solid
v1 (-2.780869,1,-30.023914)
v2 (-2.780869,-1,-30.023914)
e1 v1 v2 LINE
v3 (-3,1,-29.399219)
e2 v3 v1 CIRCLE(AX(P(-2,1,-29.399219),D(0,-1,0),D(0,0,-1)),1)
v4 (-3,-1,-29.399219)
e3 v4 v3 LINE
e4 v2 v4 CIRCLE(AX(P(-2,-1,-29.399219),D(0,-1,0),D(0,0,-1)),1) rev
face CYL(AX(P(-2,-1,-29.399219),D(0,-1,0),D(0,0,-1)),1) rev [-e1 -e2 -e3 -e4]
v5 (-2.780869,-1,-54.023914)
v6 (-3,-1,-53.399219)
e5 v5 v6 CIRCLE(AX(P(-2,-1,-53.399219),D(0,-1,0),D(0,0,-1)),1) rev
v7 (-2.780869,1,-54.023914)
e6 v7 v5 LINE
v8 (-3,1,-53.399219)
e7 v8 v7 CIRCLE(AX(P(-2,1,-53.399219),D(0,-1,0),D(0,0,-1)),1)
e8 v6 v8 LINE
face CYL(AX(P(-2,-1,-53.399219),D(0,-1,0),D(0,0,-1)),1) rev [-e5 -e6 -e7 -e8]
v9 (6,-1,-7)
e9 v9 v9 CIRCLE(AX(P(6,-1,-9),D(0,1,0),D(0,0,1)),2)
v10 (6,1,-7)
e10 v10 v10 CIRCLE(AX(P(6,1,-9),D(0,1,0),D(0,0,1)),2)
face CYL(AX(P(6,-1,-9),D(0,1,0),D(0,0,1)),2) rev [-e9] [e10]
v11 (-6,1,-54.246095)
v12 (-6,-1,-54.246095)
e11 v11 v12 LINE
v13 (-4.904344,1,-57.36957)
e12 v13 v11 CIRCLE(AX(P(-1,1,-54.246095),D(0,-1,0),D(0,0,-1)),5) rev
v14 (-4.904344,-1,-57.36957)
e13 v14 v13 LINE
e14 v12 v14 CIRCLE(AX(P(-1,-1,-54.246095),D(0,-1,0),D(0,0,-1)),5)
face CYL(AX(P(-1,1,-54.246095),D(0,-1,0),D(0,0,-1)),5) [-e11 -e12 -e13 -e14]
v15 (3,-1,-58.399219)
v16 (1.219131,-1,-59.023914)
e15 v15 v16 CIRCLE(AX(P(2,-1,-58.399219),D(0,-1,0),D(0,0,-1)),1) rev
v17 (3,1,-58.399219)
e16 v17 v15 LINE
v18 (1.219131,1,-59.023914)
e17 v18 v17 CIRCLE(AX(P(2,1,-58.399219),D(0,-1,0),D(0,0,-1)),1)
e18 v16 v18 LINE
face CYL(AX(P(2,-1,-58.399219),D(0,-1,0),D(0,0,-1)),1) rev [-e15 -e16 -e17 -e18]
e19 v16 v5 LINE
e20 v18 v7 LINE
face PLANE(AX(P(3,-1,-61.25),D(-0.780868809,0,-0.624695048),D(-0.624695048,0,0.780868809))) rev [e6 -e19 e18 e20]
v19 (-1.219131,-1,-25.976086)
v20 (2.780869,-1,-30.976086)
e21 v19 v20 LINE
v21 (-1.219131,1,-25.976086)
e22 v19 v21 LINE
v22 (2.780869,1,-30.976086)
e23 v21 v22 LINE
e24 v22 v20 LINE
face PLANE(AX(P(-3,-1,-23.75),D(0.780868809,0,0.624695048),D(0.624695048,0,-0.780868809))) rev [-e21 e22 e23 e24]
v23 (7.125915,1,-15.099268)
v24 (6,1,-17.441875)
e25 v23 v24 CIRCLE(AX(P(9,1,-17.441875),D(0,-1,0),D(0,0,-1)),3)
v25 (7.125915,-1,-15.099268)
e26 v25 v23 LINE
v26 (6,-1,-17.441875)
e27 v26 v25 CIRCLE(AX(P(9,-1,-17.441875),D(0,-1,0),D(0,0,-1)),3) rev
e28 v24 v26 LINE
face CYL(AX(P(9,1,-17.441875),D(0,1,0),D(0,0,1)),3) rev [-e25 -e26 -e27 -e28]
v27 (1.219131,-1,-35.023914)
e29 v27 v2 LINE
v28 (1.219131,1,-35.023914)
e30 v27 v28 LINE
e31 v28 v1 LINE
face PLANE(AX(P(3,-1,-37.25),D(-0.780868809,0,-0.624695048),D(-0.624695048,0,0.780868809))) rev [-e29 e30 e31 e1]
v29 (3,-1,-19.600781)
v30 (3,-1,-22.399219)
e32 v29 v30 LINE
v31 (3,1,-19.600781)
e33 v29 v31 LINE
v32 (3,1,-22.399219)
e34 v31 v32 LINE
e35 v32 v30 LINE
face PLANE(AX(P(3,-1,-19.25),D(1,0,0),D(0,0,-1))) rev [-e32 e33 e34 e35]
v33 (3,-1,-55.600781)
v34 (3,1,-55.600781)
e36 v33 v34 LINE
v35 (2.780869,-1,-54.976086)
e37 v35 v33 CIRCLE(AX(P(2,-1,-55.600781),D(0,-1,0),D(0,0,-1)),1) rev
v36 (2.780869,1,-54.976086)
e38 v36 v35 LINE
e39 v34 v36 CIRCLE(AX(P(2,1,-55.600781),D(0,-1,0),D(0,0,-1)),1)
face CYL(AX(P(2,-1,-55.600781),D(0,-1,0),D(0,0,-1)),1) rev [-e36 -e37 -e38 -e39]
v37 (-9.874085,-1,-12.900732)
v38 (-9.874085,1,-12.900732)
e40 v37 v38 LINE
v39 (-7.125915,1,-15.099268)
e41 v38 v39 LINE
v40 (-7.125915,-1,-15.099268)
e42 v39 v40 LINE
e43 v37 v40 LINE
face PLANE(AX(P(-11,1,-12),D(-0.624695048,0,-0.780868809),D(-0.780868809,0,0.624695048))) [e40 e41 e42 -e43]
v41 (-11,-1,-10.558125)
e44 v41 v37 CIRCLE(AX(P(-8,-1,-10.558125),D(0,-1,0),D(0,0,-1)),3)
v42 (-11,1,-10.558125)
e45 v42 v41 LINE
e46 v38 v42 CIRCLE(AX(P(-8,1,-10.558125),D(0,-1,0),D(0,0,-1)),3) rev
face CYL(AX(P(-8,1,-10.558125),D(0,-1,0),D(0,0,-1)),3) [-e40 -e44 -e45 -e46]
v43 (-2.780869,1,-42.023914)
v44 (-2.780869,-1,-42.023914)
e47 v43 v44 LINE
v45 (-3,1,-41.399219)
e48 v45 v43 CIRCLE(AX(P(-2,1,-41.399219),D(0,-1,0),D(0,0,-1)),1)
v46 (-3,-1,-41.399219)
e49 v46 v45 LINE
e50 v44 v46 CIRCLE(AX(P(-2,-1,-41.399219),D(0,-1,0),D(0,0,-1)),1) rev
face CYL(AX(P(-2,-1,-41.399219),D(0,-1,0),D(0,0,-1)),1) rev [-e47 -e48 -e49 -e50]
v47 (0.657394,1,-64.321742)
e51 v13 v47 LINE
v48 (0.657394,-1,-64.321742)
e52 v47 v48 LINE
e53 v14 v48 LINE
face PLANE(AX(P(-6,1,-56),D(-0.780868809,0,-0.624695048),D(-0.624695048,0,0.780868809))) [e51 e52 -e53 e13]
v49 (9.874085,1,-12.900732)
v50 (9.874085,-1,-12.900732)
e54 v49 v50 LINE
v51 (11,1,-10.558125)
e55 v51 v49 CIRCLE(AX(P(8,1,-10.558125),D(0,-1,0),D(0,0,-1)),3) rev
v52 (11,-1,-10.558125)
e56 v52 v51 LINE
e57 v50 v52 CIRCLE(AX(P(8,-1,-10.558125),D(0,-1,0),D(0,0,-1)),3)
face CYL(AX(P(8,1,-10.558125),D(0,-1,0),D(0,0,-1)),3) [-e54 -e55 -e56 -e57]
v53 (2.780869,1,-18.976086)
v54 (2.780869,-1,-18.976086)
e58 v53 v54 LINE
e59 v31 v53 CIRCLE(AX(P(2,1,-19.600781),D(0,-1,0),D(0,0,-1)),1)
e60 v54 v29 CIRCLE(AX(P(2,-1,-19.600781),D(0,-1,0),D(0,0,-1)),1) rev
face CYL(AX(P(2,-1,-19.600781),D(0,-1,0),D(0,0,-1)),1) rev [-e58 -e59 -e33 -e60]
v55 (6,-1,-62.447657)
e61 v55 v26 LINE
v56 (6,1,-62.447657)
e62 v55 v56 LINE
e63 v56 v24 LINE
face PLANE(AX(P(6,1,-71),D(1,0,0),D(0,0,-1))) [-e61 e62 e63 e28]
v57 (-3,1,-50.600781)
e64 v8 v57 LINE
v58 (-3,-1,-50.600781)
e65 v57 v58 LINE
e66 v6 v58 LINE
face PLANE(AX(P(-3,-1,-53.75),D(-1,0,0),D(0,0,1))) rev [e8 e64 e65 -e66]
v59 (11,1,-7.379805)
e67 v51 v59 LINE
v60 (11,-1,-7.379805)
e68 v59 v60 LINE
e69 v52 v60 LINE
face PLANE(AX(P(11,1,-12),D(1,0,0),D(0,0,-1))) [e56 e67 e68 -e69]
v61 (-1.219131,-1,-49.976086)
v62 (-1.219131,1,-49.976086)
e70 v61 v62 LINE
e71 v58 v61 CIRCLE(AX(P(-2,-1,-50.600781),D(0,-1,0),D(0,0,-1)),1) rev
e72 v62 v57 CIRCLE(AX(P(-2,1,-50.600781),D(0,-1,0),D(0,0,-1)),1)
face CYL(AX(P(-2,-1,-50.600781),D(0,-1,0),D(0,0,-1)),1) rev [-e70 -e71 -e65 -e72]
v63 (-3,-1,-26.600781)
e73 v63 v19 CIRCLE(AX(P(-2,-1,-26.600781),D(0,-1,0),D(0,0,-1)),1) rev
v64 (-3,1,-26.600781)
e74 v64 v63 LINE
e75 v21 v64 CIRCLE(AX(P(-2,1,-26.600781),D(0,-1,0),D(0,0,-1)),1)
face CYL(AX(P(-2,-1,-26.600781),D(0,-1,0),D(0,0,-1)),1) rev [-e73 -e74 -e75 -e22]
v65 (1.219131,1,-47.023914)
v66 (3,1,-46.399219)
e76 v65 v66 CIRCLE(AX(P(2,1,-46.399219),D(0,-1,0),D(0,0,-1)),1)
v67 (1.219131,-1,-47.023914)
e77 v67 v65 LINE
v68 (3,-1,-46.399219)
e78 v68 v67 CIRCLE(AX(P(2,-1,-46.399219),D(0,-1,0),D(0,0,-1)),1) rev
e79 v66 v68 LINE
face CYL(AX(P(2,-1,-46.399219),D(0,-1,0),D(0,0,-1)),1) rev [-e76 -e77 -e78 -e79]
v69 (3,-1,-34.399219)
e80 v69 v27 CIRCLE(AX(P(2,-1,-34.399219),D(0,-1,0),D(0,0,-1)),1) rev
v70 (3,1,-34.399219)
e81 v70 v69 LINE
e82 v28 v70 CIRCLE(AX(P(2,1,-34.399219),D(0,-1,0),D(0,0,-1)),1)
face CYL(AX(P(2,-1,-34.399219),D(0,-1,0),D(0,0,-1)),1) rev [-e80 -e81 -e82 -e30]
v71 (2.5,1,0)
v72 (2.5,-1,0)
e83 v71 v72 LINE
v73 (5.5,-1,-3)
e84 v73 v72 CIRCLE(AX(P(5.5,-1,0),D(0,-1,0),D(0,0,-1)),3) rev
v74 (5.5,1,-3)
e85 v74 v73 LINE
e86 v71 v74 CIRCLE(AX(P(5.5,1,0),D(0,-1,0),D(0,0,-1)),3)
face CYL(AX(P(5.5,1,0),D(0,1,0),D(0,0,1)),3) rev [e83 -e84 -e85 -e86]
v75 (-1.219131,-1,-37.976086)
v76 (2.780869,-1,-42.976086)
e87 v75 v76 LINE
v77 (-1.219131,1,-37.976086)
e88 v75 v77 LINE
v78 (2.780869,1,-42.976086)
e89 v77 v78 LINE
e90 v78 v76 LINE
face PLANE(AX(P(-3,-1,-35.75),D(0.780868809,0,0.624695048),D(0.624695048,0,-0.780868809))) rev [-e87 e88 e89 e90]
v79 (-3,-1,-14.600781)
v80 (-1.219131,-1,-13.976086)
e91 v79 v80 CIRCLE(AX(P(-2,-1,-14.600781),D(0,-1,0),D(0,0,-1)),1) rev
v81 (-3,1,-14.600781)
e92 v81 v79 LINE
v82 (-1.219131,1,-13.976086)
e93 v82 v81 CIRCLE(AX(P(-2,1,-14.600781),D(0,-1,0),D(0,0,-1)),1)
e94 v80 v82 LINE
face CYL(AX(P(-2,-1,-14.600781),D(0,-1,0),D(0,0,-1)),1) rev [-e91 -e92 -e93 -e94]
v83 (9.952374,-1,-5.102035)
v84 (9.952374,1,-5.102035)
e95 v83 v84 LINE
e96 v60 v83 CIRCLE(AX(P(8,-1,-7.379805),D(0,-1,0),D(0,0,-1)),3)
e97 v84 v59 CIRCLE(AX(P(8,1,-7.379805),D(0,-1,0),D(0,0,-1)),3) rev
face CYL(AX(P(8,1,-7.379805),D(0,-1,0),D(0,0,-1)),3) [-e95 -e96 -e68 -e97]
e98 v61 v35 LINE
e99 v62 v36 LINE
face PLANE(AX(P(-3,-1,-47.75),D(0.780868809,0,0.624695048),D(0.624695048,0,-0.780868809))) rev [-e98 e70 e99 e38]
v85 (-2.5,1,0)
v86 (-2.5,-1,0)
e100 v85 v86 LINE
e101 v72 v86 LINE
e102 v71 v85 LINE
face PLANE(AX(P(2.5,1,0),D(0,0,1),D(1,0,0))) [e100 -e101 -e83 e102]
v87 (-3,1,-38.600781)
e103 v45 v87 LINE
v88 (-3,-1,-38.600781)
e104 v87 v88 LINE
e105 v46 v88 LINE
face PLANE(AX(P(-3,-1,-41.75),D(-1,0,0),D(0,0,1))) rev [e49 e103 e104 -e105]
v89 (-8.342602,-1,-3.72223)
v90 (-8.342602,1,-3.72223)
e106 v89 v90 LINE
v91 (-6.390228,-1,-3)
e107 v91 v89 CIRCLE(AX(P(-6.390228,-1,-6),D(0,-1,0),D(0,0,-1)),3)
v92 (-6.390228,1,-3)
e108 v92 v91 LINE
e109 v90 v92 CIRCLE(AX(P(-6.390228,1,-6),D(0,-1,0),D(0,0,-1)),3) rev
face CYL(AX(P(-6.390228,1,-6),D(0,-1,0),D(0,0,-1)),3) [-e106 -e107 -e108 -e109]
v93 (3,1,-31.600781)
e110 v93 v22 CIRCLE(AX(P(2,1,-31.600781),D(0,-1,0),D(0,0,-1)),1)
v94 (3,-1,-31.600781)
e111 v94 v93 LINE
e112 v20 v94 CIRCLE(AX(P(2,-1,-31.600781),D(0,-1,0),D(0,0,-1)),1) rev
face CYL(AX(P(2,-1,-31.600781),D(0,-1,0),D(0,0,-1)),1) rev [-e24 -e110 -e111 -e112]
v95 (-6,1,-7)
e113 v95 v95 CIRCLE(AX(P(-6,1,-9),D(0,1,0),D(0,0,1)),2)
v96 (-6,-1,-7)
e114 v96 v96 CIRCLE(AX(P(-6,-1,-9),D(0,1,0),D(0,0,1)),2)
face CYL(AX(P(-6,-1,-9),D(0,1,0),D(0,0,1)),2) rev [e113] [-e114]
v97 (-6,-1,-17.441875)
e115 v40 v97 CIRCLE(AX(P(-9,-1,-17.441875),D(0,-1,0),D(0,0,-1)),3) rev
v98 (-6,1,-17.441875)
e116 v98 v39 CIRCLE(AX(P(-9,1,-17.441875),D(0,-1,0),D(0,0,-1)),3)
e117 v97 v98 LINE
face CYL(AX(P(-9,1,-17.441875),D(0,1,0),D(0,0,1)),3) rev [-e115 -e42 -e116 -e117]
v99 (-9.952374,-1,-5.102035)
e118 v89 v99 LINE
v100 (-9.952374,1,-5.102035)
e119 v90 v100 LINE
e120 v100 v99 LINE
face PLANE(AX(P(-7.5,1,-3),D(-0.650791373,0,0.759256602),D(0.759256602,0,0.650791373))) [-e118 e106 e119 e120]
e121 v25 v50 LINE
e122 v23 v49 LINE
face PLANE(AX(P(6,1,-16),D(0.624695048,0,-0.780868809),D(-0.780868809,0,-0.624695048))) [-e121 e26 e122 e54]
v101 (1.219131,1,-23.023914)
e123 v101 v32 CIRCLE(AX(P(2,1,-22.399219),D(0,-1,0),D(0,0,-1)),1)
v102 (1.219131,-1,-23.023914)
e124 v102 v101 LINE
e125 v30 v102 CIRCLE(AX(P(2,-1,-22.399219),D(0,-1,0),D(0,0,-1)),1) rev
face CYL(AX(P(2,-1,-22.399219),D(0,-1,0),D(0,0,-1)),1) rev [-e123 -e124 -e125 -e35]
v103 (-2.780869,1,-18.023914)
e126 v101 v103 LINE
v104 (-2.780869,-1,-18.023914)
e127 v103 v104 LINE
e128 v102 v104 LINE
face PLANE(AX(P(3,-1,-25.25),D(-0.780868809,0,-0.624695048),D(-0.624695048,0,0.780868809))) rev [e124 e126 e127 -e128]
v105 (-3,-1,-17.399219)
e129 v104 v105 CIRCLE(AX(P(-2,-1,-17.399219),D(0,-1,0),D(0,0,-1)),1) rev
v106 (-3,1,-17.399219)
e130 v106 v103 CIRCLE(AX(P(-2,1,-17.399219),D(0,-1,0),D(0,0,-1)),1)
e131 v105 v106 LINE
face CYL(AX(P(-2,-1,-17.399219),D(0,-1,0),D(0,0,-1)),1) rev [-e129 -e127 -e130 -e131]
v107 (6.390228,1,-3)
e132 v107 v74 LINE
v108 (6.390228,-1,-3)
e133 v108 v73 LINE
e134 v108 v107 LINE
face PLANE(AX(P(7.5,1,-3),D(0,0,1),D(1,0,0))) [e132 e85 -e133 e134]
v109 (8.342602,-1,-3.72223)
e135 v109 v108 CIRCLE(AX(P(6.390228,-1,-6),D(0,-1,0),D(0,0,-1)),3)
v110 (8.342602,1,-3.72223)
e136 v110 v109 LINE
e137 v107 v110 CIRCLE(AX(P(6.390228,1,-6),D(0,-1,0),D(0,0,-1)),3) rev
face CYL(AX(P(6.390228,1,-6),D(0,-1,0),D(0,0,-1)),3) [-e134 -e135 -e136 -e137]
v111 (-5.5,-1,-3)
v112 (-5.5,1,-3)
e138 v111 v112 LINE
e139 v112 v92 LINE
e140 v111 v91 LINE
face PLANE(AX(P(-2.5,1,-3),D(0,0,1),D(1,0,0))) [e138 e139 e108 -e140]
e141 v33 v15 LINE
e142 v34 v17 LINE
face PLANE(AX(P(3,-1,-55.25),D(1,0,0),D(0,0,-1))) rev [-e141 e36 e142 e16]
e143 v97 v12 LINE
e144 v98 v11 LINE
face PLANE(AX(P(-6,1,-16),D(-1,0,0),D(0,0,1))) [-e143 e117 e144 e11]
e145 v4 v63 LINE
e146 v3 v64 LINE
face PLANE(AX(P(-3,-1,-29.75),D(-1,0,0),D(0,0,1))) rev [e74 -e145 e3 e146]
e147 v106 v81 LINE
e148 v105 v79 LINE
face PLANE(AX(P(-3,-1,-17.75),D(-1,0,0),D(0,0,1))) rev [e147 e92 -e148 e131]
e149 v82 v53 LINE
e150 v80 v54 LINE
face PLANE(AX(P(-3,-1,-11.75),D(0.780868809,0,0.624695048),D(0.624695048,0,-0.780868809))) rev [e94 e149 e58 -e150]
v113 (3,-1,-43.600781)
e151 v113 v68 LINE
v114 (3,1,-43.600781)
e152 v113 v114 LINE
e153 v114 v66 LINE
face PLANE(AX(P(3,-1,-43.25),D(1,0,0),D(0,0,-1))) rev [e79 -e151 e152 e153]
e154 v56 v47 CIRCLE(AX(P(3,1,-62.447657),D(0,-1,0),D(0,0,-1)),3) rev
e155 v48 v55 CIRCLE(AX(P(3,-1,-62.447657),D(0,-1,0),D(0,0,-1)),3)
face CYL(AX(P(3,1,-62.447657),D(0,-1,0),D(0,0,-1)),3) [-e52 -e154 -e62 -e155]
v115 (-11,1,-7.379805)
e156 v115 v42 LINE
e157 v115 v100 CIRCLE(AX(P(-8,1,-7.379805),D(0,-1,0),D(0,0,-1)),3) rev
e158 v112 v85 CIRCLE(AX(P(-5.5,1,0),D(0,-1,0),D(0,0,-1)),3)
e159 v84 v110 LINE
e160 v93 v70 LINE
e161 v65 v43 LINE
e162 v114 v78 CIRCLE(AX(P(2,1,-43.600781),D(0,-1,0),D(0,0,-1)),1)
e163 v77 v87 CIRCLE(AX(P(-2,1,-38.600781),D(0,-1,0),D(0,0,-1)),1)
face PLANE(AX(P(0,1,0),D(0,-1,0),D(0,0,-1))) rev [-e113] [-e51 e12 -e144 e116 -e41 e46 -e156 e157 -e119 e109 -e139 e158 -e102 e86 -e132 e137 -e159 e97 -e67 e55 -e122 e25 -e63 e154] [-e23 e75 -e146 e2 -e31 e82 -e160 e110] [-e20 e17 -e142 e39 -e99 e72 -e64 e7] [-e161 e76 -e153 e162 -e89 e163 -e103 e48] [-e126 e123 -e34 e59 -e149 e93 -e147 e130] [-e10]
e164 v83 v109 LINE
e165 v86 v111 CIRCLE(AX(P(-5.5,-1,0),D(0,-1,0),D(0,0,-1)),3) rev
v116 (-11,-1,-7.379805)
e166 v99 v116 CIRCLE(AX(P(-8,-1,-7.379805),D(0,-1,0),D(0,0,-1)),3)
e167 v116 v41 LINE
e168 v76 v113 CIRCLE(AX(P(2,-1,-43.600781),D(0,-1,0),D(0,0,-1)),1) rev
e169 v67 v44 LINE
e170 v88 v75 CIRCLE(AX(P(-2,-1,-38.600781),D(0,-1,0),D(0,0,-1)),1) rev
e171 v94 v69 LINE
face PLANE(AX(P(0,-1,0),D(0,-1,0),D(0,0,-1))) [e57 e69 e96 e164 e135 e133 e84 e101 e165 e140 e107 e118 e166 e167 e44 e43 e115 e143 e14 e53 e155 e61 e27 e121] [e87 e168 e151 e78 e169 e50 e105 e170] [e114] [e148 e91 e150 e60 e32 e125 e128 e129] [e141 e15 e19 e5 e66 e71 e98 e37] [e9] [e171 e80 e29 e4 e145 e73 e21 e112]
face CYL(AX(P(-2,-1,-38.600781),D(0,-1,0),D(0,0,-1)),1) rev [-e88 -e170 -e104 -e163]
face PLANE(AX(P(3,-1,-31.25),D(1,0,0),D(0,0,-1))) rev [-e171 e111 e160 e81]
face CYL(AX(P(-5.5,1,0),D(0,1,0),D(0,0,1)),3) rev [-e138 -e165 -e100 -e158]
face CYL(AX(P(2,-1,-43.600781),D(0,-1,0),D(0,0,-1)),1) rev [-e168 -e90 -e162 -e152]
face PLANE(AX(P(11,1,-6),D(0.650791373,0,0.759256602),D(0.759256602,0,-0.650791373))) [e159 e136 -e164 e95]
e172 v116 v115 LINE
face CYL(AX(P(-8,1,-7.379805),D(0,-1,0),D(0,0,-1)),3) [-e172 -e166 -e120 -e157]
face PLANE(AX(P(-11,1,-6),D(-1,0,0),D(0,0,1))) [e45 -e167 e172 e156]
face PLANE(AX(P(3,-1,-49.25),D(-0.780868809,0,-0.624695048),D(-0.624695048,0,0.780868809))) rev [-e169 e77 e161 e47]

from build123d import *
from OCP.BRepFilletAPI import BRepFilletAPI_MakeFillet

# Parameters (mm, degrees)
BOSS_EXTRUDE1_DEPTH     = 1
CUT_EXTRUDE1_DEPTH      = 72.854018677
CUT_EXTRUDE2_DEPTH      = 72.854018677
CUT_EXTRUDE2_DEPTH_BACK = 72.854018677
SKETCH2_R               = 2
FILLET1_R               = 3
FILLET2_R               = 3
FILLET3_R1              = 5
FILLET3_R2              = 3
FILLET4_R               = 1
LPATTERN1_COUNT         = 4
LPATTERN1_PITCH         = 12
FILLET4_OF_LPATTERN1_R  = 1


with BuildPart() as part:
    # Sketch1 → Boss-Extrude1 (new, symmetric)
    with BuildSketch(Plane(origin=(0, 0, 0), x_dir=(1, 0, 0), z_dir=(0, 1, 0))):
        Polygon((-6, 56), (6, 71), (6, 16), (11, 12), (11, 6), (7.5, 3), (2.5, 3), (2.5, 0), (-2.5, 0), (-2.5, 3), (-7.5, 3), (-11, 6), (-11, 12), (-6, 16), align=None)
    extrude(amount=BOSS_EXTRUDE1_DEPTH, both=True)

    # Sketch1<3> → Cut-Extrude1 (cut, symmetric)
    with BuildSketch(Plane(origin=(0, 0, 0), x_dir=(1, 0, 0), z_dir=(0, 1, 0))):
        Polygon((3, 61.25), (-3, 53.75), (-3, 47.75), (3, 55.25), align=None)
    cut_extrude1 = extrude(amount=CUT_EXTRUDE1_DEPTH, both=True, mode=Mode.SUBTRACT)

    # Sketch2 → Cut-Extrude2 (cut, two sides: drawn at the far end of the back side and taken through both)
    with BuildSketch(Plane(origin=(0, 0, 0), x_dir=(1, 0, 0), z_dir=(0, 1, 0)).offset(-CUT_EXTRUDE2_DEPTH_BACK)):
        with Locations(Location((-6, 9, 0), (0, 0, 270))):
            Circle(SKETCH2_R)
        with Locations(Location((6, 9, 0), (0, 0, 270))):
            Circle(SKETCH2_R)
    extrude(amount=CUT_EXTRUDE2_DEPTH + CUT_EXTRUDE2_DEPTH_BACK, mode=Mode.SUBTRACT)

    # Fillet1
    fillet1_edges = [part.edges().sort_by_distance(p)[0] for p in [
        (2.5, 0, -3),
        (-2.5, 0, -3),
    ]]
    fillet(fillet1_edges, radius=FILLET1_R - 0.0001)  # a hair under: the kernel refuses the full size

    # Fillet2
    fillet2_edges = [part.edges().sort_by_distance(p)[0] for p in [
        (-6, 0, -16),
        (-11, 0, -12),
        (-11, 0, -6),
        (-7.5, 0, -3),
        (7.5, 0, -3),
        (11, 0, -6),
        (11, 0, -12),
        (6, 0, -16),
    ]]
    fillet(fillet2_edges, radius=FILLET2_R)

    # Fillet3: one fillet with a radius per group of edges: ONE call of the kernel's fillet builder (fillet() takes one radius for all edges)
    fillet3_edges_1 = [part.edges().sort_by_distance(p)[0] for p in [
        (-6, 0, -56),
    ]]
    fillet3_edges_2 = [part.edges().sort_by_distance(p)[0] for p in [
        (6, 0, -71),
    ]]
    fillet3 = BRepFilletAPI_MakeFillet(part.part.solid().wrapped)
    for e in fillet3_edges_1:
        fillet3.Add(FILLET3_R1, e.wrapped)
    for e in fillet3_edges_2:
        fillet3.Add(FILLET3_R2, e.wrapped)
    add(Compound.cast(fillet3.Shape()), mode=Mode.REPLACE)

    # Fillet4
    fillet4_edges = [part.edges().sort_by_distance(p)[0] for p in [
        (-3, 0, -47.75),
        (-3, 0, -53.75),
        (3, 0, -61.25),
        (3, 0, -55.25),
    ]]
    fillet(fillet4_edges, radius=FILLET4_R)

    # LPattern1: Cut-Extrude1 ×4
    with Locations(*[(0, 0, i * LPATTERN1_PITCH) for i in range(1, LPATTERN1_COUNT)]):
        add(cut_extrude1, mode=Mode.SUBTRACT)

    # Fillet4 of LPattern1
    fillet4_of_lpattern1_edges = [part.edges().sort_by_distance(p)[0] for p in [
        (-3, 0, -35.75),
        (-3, 0, -41.75),
        (3, 0, -49.25),
        (3, 0, -43.25),
        (-3, 0, -23.75),
        (-3, 0, -29.75),
        (3, 0, -37.25),
        (3, 0, -31.25),
        (-3, 0, -11.75),
        (-3, 0, -17.75),
        (3, 0, -25.25),
        (3, 0, -19.25),
    ]]
    fillet(fillet4_of_lpattern1_edges, radius=FILLET4_OF_LPATTERN1_R)


solid = part.part
